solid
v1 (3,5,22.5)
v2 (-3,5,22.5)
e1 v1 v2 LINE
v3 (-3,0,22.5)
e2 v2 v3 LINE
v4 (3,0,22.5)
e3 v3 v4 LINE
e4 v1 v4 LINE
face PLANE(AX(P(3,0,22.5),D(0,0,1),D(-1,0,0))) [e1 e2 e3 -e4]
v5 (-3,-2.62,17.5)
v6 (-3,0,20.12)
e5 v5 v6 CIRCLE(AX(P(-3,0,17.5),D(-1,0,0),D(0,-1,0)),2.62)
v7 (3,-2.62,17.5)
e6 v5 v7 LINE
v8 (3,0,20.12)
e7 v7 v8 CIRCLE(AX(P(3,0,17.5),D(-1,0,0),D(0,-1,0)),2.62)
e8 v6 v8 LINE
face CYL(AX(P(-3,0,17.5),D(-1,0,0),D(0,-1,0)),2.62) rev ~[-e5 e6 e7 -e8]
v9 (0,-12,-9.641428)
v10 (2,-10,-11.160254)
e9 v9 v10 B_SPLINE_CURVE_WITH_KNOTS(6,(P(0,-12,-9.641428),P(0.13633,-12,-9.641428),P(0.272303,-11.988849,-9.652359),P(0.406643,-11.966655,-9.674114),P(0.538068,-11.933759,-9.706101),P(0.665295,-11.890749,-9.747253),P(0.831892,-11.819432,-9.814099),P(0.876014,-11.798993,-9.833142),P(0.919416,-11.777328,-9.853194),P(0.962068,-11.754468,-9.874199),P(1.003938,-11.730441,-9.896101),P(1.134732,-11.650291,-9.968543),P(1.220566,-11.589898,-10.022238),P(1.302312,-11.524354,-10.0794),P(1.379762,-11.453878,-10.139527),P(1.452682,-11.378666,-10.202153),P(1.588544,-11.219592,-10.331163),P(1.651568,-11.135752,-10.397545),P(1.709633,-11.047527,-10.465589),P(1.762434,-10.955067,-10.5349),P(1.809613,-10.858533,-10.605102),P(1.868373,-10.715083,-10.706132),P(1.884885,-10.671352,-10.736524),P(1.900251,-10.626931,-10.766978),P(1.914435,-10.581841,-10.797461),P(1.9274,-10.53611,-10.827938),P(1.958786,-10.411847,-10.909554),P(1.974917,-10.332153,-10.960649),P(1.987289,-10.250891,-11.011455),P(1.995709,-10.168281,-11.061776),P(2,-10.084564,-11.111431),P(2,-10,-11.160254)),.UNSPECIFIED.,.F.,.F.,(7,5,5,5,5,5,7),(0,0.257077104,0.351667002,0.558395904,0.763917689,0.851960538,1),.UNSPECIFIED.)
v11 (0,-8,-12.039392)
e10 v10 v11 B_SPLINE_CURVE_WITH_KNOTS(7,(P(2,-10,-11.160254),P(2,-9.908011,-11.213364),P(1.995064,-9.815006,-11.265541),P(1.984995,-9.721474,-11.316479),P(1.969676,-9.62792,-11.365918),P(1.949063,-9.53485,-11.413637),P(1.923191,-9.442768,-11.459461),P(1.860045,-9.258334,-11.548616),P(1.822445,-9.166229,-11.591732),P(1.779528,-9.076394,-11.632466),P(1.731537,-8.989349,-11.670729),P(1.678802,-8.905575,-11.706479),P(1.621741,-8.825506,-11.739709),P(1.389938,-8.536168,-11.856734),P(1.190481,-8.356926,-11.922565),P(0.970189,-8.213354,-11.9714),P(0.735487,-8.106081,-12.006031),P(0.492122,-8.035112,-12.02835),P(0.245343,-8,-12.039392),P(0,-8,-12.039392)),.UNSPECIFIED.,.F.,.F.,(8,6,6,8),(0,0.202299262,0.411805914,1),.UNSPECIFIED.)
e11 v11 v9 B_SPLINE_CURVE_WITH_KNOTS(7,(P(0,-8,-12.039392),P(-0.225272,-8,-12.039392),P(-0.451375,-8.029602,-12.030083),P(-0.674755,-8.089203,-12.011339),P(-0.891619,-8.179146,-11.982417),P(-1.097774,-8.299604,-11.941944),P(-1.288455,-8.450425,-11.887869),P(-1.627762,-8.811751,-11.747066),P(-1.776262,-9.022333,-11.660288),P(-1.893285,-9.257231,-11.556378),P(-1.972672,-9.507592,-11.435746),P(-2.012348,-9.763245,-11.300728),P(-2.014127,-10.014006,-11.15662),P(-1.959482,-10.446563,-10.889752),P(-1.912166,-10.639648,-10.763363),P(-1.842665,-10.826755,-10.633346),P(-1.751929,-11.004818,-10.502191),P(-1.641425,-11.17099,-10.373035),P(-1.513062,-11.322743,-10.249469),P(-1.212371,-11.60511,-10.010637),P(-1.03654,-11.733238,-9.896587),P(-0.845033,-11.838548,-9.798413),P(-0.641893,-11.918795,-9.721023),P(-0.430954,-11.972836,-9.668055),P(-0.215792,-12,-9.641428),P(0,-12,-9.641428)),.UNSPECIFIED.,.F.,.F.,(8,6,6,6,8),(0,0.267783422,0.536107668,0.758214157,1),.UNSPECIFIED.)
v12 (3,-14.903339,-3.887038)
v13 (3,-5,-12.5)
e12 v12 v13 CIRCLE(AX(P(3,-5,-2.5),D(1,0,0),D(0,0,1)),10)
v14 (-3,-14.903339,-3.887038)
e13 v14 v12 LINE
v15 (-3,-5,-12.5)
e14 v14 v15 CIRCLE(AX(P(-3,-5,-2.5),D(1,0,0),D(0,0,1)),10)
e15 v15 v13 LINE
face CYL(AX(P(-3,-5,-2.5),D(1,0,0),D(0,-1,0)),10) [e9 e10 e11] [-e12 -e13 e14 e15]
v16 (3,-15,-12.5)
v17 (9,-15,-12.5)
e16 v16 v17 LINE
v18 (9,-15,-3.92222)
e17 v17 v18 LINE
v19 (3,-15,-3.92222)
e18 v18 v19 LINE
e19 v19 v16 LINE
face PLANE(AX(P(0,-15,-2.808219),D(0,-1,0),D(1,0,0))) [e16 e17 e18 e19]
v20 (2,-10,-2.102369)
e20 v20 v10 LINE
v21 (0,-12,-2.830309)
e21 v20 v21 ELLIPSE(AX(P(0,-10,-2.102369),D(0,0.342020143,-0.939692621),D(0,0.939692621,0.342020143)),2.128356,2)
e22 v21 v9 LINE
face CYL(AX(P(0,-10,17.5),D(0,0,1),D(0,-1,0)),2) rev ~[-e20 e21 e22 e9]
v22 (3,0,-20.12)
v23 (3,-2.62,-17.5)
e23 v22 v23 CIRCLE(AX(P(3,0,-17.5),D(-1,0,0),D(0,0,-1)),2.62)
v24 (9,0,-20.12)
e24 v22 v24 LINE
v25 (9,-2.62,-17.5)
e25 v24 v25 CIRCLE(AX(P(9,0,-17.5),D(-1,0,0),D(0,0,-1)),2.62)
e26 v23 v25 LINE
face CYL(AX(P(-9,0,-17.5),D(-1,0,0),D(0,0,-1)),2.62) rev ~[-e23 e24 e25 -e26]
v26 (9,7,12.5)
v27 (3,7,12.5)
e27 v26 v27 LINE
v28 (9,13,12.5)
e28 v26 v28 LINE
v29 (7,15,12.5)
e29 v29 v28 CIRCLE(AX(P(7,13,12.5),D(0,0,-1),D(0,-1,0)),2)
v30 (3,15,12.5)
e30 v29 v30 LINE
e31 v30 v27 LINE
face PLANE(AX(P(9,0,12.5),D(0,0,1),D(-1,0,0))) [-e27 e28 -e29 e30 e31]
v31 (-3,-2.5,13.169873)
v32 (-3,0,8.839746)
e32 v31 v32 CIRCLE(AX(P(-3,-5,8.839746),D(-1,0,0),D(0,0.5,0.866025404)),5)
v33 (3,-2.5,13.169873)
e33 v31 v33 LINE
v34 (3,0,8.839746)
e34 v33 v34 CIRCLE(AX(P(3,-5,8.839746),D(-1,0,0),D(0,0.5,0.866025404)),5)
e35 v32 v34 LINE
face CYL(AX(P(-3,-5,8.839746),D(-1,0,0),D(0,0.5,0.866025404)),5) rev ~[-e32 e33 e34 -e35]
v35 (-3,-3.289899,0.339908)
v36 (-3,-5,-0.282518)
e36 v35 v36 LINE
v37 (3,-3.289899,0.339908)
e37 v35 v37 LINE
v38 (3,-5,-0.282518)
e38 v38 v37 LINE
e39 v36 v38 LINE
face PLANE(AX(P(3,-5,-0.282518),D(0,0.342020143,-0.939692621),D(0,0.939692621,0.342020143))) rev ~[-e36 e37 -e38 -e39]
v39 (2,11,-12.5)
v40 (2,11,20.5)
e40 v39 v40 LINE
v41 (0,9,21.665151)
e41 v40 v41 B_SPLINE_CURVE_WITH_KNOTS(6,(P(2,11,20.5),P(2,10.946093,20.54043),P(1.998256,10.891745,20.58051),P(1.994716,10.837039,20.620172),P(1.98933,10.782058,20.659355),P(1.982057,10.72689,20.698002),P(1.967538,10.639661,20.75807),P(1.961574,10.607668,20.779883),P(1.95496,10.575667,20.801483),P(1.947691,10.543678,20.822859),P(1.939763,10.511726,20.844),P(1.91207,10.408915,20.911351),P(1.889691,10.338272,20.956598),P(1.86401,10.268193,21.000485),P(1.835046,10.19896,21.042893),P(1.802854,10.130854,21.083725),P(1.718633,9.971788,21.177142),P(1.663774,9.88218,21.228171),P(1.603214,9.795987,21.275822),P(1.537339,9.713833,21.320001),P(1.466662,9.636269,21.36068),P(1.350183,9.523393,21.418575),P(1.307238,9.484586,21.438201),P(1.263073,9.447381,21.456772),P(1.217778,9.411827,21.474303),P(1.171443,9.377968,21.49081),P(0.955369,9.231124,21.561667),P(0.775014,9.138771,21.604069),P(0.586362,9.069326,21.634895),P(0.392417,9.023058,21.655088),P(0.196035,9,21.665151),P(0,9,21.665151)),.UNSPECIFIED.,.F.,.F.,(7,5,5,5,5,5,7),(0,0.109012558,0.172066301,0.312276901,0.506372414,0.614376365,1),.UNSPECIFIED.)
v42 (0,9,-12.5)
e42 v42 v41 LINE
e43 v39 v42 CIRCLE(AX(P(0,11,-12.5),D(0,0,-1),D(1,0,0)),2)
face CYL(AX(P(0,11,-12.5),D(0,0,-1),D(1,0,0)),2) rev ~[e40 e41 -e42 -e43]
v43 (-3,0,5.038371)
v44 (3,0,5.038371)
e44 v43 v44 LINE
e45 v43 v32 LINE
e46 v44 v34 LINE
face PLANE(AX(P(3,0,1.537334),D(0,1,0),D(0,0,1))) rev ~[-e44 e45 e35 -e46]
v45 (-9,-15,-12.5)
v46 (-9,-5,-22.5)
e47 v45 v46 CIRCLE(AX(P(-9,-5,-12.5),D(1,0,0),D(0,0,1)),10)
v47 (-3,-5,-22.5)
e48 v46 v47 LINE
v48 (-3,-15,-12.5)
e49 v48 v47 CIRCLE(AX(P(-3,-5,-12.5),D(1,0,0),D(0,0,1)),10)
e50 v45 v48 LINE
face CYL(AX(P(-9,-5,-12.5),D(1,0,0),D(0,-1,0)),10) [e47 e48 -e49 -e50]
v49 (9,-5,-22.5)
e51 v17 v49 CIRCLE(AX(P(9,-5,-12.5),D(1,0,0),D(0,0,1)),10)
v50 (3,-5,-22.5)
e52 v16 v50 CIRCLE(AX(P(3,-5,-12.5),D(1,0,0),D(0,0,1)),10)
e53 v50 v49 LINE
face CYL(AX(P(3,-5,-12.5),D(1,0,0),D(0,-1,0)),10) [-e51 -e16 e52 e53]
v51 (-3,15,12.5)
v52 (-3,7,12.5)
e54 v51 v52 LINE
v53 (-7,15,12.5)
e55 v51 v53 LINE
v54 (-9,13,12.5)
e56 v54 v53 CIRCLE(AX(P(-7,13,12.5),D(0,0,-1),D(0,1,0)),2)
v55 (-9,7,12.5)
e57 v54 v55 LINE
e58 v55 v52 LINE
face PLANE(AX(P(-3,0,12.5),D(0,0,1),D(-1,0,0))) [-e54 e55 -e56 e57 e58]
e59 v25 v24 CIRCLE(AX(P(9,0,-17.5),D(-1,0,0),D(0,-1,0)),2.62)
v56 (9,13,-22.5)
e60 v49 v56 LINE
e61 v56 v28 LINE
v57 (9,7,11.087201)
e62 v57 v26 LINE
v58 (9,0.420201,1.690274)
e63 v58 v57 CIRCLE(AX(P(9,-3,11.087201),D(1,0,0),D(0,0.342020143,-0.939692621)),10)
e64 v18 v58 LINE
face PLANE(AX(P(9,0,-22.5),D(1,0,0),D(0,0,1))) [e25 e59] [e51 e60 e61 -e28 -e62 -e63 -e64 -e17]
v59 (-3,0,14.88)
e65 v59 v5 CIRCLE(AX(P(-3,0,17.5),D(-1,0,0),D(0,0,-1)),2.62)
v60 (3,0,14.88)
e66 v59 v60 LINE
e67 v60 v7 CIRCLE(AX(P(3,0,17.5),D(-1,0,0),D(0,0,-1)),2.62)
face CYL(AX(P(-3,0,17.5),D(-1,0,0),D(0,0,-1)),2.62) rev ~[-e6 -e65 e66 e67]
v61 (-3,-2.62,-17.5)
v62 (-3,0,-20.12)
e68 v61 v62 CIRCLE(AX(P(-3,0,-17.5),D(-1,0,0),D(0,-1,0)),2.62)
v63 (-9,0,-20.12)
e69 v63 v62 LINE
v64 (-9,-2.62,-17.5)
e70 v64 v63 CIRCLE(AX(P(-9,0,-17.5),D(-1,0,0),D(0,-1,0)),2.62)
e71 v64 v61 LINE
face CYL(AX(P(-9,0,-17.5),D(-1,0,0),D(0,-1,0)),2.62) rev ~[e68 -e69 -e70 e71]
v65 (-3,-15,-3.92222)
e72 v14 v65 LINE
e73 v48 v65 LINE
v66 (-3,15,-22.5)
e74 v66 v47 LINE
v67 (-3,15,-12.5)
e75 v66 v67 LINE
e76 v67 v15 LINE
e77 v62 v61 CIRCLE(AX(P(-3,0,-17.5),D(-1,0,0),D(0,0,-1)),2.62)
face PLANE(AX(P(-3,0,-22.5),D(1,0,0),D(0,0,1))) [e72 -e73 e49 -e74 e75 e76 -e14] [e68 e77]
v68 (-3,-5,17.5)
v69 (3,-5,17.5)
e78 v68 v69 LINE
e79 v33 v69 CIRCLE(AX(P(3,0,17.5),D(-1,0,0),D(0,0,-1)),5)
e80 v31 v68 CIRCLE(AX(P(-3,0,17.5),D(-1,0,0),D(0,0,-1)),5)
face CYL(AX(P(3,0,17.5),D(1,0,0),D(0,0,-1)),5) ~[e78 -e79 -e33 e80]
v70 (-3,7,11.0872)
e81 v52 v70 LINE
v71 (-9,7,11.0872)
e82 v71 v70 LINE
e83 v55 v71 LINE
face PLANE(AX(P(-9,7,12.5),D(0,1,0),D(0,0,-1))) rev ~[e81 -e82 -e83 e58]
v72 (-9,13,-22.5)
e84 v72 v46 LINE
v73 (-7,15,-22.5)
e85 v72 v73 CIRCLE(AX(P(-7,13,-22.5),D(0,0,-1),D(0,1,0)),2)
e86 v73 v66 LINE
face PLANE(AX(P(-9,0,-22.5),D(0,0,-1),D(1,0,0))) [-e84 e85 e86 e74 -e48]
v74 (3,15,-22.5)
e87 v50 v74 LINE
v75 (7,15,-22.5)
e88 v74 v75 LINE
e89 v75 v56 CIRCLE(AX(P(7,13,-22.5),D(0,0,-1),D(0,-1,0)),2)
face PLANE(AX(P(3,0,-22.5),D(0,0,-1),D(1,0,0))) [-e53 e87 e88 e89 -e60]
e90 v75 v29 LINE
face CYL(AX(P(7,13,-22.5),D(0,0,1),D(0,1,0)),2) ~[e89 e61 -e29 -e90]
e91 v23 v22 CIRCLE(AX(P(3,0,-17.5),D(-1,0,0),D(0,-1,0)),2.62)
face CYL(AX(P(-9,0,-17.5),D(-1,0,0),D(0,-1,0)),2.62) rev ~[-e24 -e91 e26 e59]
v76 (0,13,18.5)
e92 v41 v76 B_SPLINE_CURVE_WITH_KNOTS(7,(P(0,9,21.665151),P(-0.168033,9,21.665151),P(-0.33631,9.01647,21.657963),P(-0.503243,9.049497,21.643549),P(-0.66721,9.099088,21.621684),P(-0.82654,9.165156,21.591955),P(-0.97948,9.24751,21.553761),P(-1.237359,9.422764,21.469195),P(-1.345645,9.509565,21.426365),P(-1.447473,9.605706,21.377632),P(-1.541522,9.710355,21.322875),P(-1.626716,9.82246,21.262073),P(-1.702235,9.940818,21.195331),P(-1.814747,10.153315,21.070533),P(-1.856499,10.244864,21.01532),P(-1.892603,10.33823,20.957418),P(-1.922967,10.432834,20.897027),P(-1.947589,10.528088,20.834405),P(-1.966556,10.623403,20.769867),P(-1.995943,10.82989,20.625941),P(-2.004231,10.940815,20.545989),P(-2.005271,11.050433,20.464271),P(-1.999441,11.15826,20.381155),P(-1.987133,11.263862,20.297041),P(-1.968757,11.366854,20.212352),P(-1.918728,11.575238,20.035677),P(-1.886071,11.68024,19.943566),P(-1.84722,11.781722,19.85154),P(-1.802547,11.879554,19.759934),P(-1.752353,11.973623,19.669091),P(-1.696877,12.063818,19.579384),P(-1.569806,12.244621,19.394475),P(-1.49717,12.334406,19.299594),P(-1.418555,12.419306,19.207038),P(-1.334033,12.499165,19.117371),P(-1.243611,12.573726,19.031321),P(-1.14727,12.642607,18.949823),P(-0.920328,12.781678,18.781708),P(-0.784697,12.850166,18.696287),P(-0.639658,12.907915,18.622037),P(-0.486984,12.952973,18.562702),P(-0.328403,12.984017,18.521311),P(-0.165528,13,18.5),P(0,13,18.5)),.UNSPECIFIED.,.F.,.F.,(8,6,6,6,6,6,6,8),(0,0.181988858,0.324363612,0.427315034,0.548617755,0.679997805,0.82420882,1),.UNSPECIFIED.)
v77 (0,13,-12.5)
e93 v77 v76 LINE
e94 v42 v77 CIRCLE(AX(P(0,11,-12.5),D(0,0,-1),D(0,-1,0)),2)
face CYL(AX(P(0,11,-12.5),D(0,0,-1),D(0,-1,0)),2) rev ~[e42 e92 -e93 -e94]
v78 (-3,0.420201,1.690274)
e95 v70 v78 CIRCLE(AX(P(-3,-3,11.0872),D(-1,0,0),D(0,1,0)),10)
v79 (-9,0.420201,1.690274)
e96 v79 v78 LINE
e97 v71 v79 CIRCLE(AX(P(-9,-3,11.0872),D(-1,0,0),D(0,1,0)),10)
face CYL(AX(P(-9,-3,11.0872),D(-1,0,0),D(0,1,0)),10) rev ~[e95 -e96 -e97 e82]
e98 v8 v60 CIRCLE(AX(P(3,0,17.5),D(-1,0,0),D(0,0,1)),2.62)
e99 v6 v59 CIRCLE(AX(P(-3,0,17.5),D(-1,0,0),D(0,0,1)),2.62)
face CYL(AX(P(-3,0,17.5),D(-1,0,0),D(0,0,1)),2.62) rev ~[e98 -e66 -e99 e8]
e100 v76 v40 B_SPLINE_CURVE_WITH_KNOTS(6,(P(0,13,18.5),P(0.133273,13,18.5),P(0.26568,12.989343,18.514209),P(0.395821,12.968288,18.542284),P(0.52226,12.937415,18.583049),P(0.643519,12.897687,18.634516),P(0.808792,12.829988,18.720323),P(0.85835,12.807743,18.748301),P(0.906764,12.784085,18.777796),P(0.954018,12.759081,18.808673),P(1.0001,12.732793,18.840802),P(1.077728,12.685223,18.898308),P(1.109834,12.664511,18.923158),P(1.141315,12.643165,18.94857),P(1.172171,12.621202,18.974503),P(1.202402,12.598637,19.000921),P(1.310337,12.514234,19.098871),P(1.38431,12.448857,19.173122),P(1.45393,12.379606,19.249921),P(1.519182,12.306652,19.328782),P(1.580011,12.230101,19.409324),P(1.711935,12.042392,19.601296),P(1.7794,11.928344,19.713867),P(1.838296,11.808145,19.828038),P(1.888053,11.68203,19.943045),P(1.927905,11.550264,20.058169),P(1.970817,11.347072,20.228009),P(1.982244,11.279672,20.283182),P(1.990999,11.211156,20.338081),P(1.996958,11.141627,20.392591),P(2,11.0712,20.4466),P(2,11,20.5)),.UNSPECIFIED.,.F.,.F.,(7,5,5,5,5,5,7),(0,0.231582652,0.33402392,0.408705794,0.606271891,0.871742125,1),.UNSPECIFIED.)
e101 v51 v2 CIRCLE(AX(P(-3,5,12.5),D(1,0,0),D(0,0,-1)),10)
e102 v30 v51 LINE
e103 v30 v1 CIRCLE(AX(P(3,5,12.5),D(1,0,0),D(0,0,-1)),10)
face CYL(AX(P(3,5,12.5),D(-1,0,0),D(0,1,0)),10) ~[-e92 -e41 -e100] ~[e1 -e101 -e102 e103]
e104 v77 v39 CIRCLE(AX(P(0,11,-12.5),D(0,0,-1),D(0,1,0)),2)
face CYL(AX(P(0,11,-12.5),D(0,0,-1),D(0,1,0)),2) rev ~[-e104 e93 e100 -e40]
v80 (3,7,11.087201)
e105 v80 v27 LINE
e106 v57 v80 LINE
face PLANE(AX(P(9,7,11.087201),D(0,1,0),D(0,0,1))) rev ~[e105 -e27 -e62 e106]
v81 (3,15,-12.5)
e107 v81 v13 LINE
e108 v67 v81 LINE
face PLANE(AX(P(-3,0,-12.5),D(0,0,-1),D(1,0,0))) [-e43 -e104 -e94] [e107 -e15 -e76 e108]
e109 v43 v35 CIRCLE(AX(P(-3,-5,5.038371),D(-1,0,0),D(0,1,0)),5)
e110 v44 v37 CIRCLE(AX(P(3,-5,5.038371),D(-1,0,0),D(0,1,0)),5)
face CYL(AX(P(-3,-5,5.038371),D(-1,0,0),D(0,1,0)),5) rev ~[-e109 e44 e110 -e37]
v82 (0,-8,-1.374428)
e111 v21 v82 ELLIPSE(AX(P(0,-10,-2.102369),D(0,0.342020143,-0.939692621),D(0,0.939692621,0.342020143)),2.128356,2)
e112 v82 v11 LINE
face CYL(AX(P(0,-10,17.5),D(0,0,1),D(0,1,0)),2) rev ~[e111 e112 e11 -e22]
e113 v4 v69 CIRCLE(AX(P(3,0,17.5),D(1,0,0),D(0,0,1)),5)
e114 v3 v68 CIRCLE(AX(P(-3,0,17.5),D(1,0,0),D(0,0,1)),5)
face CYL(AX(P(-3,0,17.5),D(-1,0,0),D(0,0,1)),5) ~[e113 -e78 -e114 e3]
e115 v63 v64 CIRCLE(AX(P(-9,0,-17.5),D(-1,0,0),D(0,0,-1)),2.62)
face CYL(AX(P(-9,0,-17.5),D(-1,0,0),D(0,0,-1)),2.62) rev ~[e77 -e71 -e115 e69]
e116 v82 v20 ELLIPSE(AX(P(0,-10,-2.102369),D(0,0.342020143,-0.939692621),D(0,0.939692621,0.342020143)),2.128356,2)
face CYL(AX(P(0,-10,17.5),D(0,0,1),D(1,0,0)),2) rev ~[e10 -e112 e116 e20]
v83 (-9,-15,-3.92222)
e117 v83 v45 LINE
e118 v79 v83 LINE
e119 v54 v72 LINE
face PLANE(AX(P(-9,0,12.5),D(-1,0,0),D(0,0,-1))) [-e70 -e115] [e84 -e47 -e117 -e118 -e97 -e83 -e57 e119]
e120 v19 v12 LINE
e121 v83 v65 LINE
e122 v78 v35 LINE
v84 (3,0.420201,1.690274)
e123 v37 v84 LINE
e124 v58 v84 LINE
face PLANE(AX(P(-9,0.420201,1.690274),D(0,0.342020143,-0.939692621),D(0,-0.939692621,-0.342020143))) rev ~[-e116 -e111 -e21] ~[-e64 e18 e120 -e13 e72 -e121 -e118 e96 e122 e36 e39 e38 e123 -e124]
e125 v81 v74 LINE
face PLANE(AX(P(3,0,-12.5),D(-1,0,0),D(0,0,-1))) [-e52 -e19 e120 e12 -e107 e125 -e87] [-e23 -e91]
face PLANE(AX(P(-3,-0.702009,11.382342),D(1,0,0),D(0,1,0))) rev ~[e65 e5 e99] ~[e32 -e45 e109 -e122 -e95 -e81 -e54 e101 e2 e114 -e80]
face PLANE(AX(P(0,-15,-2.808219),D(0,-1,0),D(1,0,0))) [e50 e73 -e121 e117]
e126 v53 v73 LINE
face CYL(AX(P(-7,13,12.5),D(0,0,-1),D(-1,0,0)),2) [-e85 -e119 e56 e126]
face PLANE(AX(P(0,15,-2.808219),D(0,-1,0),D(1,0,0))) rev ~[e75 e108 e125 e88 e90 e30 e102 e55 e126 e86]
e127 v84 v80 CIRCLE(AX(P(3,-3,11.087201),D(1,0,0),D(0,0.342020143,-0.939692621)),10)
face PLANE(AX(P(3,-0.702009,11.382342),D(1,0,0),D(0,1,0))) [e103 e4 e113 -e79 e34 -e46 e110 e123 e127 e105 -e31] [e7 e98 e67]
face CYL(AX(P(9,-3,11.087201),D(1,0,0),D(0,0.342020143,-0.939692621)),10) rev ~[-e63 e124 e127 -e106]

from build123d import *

# Parameters (mm, degrees)
F1_DEPTH     = 15
F3_DEPTH     = 6
F5_DEPTH     = 18
F6_R         = 10
F7_R         = 10
F10_DEPTH    = 6
F11_DEPTH    = 6
F12_R        = 2
F14_DEPTH    = 6
F18_DEPTH    = 40
F20_DEPTH    = 40
F22_DEPTH    = 6
F23_T1_DEPTH = 6


# Not quite as in the source:
# - a fillet or chamfer that OpenCascade refuses, or shapes differently, is made with other operations: its cross-section is extruded or revolved along the edge and cut away or added


with BuildPart() as f1:
    # F0 (on Front) → F1 (new body, symmetric)
    with BuildSketch(Plane.XZ):
        Polygon((9, -12.5), (9, 12.5), (3, 12.5), (3, 22.5), (-3, 22.5), (-3, 12.5), (-9, 12.5), (-9, -12.5), (-9, -22.5), (-3, -22.5), (-3, -12.5), (3, -12.5), (3, -22.5), (9, -22.5), align=None)
    extrude(amount=F1_DEPTH, both=True)

    # F2 (on face) → F3 (cut)
    with BuildSketch(Plane(origin=(-3, 0, 0), x_dir=(0, -1, 0), z_dir=(-1, 0, 0))):
        with BuildLine():
            ThreePointArc((0, 20.12), (-2.62, 17.5), (0, 14.88))
            Line((0, 14.88), (0, 20.12))
        make_face()
        with BuildLine():
            Line((0, 20.12), (0, 14.88))
            ThreePointArc((0, 14.88), (1.8526197667, 15.6473802333), (2.62, 17.5))
            ThreePointArc((2.62, 17.5), (1.8526197667, 19.3526197667), (0, 20.12))
        make_face()
    extrude(amount=-F3_DEPTH, mode=Mode.SUBTRACT)

    # F4 (on face) → F5 (cut)
    with BuildSketch(Plane(origin=(-9, 0, 0), x_dir=(0, -1, 0), z_dir=(-1, 0, 0))):
        with BuildLine():
            ThreePointArc((0, -20.12), (1.8526197667, -19.3526197667), (2.62, -17.5))
            ThreePointArc((2.62, -17.5), (-1.8526197667, -15.6473802333), (0, -20.12))
        make_face()
    extrude(amount=-F5_DEPTH, mode=Mode.SUBTRACT)

    # F6
    f6_edges = [f1.edges().sort_by_distance(p)[0] for p in [
        (0, -15, -12.5),
    ]]
    fillet(f6_edges, radius=F6_R)

    # F7
    f7_edges = [f1.edges().sort_by_distance(p)[0] for p in [
        (0, 15, 22.5),
        (0, -15, 22.5),
        (6, -15, -22.5),
        (-6, -15, -22.5),
    ]]
    fillet(f7_edges, radius=F7_R)

    # F9 (on face) → F10 (cut)
    with BuildSketch(Plane(origin=(-9, 0, 0), x_dir=(0, -1, 0), z_dir=(-1, 0, 0))):
        with BuildLine():
            ThreePointArc((-7, 11.0872004348), (-5.1915204429, 5.3514360713), (-0.4202014333, 1.690274227))
            Line((-0.4202014333, 1.690274227), (15, -3.9222201011))
            Line((15, -3.9222201011), (15, 12.5))
            Line((15, 12.5), (-7, 12.5))
            Line((-7, 12.5), (-7, 11.0872004348))
        make_face()
    extrude(amount=-F10_DEPTH, mode=Mode.SUBTRACT)

    # F8 (on face) → F11 (cut)
    with BuildSketch(Plane.YZ.offset(9)):
        with BuildLine():
            Line((7, 12.5), (-15, 12.5))
            Line((-15, 12.5), (-15, -3.92222))
            Line((-15, -3.92222), (0.4202014333, 1.6902743281))
            ThreePointArc((0.4202014333, 1.6902743281), (5.1915204429, 5.3514361724), (7, 11.087200536))
            Line((7, 11.087200536), (7, 12.5))
        make_face()
    extrude(amount=-F11_DEPTH, mode=Mode.SUBTRACT)

    # F12
    f12_edges = [f1.edges().sort_by_distance(p)[0] for p in [
        (9, 15, -5),
        (-9, 15, -5),
    ]]
    fillet(f12_edges, radius=F12_R)

    # F13 (on face) → F14 (cut)
    with BuildSketch(Plane(origin=(-3, 0, 0), x_dir=(0, -1, 0), z_dir=(-1, 0, 0))):
        with BuildLine():
            Line((5, 22.5), (0, 22.5))
            ThreePointArc((0, 22.5), (3.5355339059, 21.0355339059), (5, 17.5))
            Line((5, 17.5), (5, -0.2825177585))
            Line((5, -0.2825177585), (14.9033390576, -3.8870383953))
            ThreePointArc((14.9033390576, -3.8870383953), (14.9758054957, -3.1952012025), (15, -2.5))
            Line((15, -2.5), (15, 12.5))
            ThreePointArc((15, 12.5), (12.0710678119, 19.5710678119), (5, 22.5))
        make_face()
    extrude(amount=-F14_DEPTH, mode=Mode.SUBTRACT)

    # F17 (on face) → F18 (cut)
    with BuildSketch(Plane.XY.offset(17.5)):
        with BuildLine():
            ThreePointArc((2, -10), (1.4142135624, -8.5857864376), (0, -8))
            Line((0, -8), (0, -12))
            ThreePointArc((0, -12), (1.4142135624, -11.4142135624), (2, -10))
        make_face()
        with BuildLine():
            Line((0, -12), (0, -8))
            ThreePointArc((0, -8), (-2, -10), (0, -12))
        make_face()
    extrude(amount=-F18_DEPTH, mode=Mode.SUBTRACT)

    # F19 (on face) → F20 (cut)
    with BuildSketch(Plane(origin=(0, 0, -12.5), x_dir=(1, 0, 0), z_dir=(0, 0, -1))):
        with BuildLine():
            Line((0, -9), (0, -11))
            Line((0, -11), (0, -13))
            ThreePointArc((0, -13), (1.4142135624, -12.4142135624), (2, -11))
            ThreePointArc((2, -11), (1.4142135624, -9.5857864376), (0, -9))
        make_face()
        with BuildLine():
            Line((0, -13), (0, -11))
            Line((0, -11), (0, -9))
            ThreePointArc((0, -9), (-2, -11), (0, -13))
        make_face()
    extrude(amount=-F20_DEPTH, mode=Mode.SUBTRACT)

    # F21 (on face) → F22 (cut)
    with BuildSketch(Plane.YZ.offset(3)):
        with BuildLine():
            ThreePointArc((0, 12.5), (-3.5355339059, 13.9644660941), (-5, 17.5))
            Line((-5, 17.5), (-5, -0.2825177585))
            Line((-5.0000000325, -0.2825176692), (0, 1.537333514))
            Line((0, 1.537333514), (0, 12.5))
        make_face()
    extrude(amount=-F22_DEPTH, mode=Mode.SUBTRACT)

    # F23: fillet of radius 5 on 2 edges, made by hand

    # F23_s2 → F23_t1 (join)
    with BuildSketch(Plane.YZ.offset(-3)):
        with BuildLine():
            ThreePointArc((-2.5, 13.1698729811), (-0.6698729811, 11.3397459622), (0, 8.8397459622))
            Line((0, 8.8397459622), (0, 12.5))
            ThreePointArc((0, 12.5), (-1.2940952255, 12.6703708686), (-2.5, 13.1698729811))
        make_face()
        with BuildLine():
            ThreePointArc((0, 5.0383711039), (-0.9042397786, 2.1704889222), (-3.2898992834, 0.339908))
            Line((-3.2898992834, 0.339908), (0, 1.537333514))
            Line((0, 1.537333514), (0, 5.0383711039))
        make_face()
    extrude(amount=F23_T1_DEPTH)


solid = f1.part
